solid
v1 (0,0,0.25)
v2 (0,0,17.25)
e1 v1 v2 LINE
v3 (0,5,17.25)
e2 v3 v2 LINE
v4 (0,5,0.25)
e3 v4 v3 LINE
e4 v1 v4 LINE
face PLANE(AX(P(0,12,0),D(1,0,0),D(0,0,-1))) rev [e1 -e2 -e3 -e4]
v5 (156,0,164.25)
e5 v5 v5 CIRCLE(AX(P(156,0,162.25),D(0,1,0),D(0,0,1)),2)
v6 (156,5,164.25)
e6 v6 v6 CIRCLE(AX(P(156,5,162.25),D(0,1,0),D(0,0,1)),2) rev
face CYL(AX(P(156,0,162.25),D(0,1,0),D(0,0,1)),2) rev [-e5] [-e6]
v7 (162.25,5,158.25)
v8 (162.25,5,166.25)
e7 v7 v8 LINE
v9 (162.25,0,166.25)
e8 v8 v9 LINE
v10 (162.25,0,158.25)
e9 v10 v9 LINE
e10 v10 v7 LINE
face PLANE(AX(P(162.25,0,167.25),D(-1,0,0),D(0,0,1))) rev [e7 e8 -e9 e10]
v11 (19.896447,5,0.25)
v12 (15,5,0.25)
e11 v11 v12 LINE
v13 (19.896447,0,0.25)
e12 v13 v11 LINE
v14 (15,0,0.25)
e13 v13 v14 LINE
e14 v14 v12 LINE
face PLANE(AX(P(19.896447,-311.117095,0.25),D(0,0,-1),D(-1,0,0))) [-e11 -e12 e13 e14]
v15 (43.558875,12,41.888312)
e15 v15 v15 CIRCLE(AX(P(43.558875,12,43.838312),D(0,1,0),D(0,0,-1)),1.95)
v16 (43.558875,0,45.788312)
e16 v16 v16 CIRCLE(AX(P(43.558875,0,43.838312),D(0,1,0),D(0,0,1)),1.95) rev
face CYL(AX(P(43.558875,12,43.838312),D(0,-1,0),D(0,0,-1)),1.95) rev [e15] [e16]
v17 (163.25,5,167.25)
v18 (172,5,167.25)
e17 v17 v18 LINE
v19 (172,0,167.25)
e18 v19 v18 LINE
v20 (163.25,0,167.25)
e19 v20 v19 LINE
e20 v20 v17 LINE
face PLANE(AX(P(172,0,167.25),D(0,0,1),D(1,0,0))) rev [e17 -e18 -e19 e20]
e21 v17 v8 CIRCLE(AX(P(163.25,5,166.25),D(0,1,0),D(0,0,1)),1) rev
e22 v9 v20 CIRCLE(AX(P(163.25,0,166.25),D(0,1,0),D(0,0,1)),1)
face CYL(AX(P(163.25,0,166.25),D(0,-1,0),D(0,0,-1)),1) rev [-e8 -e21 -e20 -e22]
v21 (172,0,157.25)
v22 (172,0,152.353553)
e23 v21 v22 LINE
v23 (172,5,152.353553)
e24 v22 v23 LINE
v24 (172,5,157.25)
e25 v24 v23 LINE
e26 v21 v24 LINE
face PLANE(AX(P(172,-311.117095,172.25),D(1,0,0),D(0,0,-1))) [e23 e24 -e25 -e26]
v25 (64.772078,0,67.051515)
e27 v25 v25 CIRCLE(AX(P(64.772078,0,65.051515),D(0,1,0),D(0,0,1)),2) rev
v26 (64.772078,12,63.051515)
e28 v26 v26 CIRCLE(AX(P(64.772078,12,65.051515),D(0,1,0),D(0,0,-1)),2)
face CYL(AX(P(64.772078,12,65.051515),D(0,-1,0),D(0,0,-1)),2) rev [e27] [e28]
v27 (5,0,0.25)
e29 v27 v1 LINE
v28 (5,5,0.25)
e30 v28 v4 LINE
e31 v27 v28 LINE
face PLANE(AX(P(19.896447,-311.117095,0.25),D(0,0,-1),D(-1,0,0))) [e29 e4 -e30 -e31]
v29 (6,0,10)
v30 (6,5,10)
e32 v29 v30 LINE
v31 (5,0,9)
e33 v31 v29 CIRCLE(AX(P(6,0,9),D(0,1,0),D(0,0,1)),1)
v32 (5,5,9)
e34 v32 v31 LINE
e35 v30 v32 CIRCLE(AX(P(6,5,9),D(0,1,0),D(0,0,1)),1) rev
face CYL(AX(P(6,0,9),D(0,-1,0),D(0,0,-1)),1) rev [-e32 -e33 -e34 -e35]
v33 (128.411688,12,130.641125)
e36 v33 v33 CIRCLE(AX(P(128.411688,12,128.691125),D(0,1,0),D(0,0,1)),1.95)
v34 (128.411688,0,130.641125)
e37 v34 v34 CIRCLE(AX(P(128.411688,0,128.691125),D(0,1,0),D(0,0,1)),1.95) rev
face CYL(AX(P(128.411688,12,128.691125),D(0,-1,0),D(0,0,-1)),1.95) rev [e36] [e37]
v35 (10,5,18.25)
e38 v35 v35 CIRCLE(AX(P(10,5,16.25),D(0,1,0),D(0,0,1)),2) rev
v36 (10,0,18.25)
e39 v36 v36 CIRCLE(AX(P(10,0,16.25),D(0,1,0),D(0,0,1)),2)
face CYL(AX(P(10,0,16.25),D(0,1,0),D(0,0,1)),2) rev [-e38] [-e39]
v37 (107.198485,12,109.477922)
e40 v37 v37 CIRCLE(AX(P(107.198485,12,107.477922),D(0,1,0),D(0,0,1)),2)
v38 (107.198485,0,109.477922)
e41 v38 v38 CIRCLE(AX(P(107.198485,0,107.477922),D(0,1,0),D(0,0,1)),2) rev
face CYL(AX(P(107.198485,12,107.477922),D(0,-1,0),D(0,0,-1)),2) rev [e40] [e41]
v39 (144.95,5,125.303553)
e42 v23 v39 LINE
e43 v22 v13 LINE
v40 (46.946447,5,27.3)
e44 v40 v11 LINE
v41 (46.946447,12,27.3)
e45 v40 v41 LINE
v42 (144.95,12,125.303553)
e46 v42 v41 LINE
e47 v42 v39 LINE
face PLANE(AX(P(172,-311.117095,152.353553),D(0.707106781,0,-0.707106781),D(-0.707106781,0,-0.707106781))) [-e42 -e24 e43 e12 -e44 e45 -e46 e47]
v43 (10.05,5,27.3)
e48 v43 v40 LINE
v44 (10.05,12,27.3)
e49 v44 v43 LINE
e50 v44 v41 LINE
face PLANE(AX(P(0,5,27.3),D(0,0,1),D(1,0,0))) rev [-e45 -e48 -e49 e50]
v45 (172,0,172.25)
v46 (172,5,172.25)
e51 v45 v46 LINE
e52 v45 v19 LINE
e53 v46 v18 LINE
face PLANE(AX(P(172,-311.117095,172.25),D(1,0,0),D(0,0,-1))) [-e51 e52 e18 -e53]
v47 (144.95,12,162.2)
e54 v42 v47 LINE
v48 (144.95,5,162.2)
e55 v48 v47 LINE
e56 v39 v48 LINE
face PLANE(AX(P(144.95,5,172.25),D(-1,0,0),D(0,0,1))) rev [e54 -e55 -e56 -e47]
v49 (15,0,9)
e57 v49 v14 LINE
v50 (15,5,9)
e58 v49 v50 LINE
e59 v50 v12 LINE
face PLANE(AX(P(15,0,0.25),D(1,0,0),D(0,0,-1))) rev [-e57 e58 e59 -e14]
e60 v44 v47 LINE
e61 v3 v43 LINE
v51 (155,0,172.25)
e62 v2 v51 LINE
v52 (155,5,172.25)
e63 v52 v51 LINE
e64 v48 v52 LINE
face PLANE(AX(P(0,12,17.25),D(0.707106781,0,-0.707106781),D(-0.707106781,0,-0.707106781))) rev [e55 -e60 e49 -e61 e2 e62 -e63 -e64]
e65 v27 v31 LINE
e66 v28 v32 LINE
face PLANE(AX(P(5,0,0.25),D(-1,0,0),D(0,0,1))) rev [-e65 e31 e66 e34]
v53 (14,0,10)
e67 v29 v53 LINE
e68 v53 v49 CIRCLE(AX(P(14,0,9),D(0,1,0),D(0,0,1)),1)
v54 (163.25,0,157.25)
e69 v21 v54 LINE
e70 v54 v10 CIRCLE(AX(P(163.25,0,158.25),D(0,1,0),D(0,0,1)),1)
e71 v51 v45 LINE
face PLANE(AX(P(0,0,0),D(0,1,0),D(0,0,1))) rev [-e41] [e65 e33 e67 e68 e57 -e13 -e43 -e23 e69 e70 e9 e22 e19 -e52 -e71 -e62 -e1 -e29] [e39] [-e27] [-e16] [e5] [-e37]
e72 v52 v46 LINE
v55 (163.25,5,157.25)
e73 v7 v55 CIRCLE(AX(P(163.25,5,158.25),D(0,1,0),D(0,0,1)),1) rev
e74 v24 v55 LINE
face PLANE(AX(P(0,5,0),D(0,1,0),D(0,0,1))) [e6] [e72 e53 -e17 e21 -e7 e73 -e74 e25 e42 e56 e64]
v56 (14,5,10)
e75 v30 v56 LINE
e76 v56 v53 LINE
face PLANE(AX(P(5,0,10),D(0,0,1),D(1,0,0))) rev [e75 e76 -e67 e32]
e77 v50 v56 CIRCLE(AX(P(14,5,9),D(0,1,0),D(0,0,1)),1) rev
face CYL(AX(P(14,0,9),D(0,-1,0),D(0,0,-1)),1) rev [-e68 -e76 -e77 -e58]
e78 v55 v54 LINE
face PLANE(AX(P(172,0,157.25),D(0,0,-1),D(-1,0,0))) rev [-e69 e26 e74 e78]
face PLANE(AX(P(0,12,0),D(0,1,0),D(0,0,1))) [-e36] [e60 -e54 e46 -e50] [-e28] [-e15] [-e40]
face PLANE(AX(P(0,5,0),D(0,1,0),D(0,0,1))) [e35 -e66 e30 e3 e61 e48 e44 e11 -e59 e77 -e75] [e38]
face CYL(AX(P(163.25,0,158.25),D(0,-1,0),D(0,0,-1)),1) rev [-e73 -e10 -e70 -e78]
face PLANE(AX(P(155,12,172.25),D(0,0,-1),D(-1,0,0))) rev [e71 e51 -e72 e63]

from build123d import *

# Parameters (mm, degrees)
BOSS_EXTRUDE1_DEPTH      = 12
SKETCH2_R                = 2
CUT_EXTRUDE1_DEPTH       = 244.893675605
SKETCH3_W                = 47.3
SKETCH3_H                = 27.3
SKETCH3_W_2              = 27.3
SKETCH3_H_2              = 47.3
CUT_EXTRUDE2_DEPTH       = 7
CUT_EXTRUDE8_DEPTH       = 244.893675605
CUT_EXTRUDE8_DEPTH_BACK  = 244.893675605
SKETCH5_R                = 1.95
SKETCH5_R_2              = 2
CUT_EXTRUDE10_DEPTH      = 244.893675605
CUT_EXTRUDE10_DEPTH_BACK = 244.893675605
SKETCH9_W                = 10
SKETCH9_H                = 9.75
SKETCH9_W_2              = 9.75
SKETCH9_H_2              = 10
CUT_EXTRUDE11_DEPTH      = 244.522201247
FILLET1_R                = 1


# Read off the part's stored shape, not the designer's step: Boss-Extrude1
with BuildPart() as part:
    # Boss-Extrude1 outline → Boss-Extrude1 (new body)
    with BuildSketch(Plane(origin=(0, 0, 0), x_dir=(1, 0, 0), z_dir=(0, 1, 0))):
        Polygon((0, 0), (0, -17.25), (155, -172.25), (172.25, -172.25), (172.25, -152.25), (20, 0), align=None)
    extrude(amount=BOSS_EXTRUDE1_DEPTH)

    # Sketch2 → Cut-Extrude1 (cut, through all)
    with BuildSketch(Plane(origin=(0, 12, 0), x_dir=(1, 0, 0), z_dir=(0, 1, 0))):
        with Locations(Location((10, -16.25, 0), (0, 0, 270))):
            Circle(SKETCH2_R)
        with Locations(Location((156, -162.25, 0), (0, 0, 270))):
            Circle(SKETCH2_R)
    extrude(amount=-CUT_EXTRUDE1_DEPTH, mode=Mode.SUBTRACT)

    # Sketch3 → Cut-Extrude2 (cut)
    with BuildSketch(Plane(origin=(0, 12, 0), x_dir=(1, 0, 0), z_dir=(0, 1, 0))):
        with Locations((23.65, -13.65)):
            Rectangle(SKETCH3_W, SKETCH3_H)
        with Locations((158.6, -148.6)):
            Rectangle(SKETCH3_W_2, SKETCH3_H_2)
    extrude(amount=-CUT_EXTRUDE2_DEPTH, mode=Mode.SUBTRACT)

    # Sketch5 → Cut-Extrude8 (cut, two sides: drawn at the far end of the back side and taken through both)
    with BuildSketch(Plane(origin=(0, 0, 0), x_dir=(1, 0, 0), z_dir=(0, 1, 0)).offset(-CUT_EXTRUDE8_DEPTH_BACK)):
        with Locations(Location((128.411688245, -128.691125497, 0), (0, 0, 270))):
            Circle(SKETCH5_R)
        with Locations(Location((107.19848481, -107.477922061, 0), (0, 0, 270))):
            Circle(SKETCH5_R_2)
        with Locations(Location((43.558874503, -43.838311755, 0), (0, 0, 90))):
            Circle(SKETCH5_R)
        with Locations(Location((64.772077939, -65.05151519, 0), (0, 0, 90))):
            Circle(SKETCH5_R_2)
    extrude(amount=CUT_EXTRUDE8_DEPTH + CUT_EXTRUDE8_DEPTH_BACK, mode=Mode.SUBTRACT)

    # Sketch8 → Cut-Extrude10 (cut, two sides: drawn at the far end of the back side and taken through both)
    with BuildSketch(Plane.XZ.offset(-CUT_EXTRUDE10_DEPTH_BACK)):
        Polygon((0, 497.196572238), (0, 0), (0, -10), (182, -10), (182, 172.25), (172, 172.25), (172, 152.353553391), (19.896446609, 0.25), (0, 0.25), (-497.196572238, 0.25), (205.768720009, -703.068934535), (702.965292247, -206.122362298), align=None)
    extrude(amount=CUT_EXTRUDE10_DEPTH + CUT_EXTRUDE10_DEPTH_BACK, mode=Mode.SUBTRACT)

    # Sketch9 → Cut-Extrude11 (cut, through all)
    with BuildSketch(Plane(origin=(0, 5, 0), x_dir=(1, 0, 0), z_dir=(0, 1, 0))):
        with Locations((10, -5.125)):
            Rectangle(SKETCH9_W, SKETCH9_H)
        with Locations((167.125, -162.25)):
            Rectangle(SKETCH9_W_2, SKETCH9_H_2)
    extrude(amount=-CUT_EXTRUDE11_DEPTH, mode=Mode.SUBTRACT)

    # Fillet1
    fillet1_edges = [part.edges().sort_by_distance(p)[0] for p in [
        (5, 2.5, 10),
        (15, 2.5, 10),
        (162.25, 2.5, 167.25),
        (162.25, 2.5, 157.25),
    ]]
    fillet(fillet1_edges, radius=FILLET1_R)


solid = part.part
